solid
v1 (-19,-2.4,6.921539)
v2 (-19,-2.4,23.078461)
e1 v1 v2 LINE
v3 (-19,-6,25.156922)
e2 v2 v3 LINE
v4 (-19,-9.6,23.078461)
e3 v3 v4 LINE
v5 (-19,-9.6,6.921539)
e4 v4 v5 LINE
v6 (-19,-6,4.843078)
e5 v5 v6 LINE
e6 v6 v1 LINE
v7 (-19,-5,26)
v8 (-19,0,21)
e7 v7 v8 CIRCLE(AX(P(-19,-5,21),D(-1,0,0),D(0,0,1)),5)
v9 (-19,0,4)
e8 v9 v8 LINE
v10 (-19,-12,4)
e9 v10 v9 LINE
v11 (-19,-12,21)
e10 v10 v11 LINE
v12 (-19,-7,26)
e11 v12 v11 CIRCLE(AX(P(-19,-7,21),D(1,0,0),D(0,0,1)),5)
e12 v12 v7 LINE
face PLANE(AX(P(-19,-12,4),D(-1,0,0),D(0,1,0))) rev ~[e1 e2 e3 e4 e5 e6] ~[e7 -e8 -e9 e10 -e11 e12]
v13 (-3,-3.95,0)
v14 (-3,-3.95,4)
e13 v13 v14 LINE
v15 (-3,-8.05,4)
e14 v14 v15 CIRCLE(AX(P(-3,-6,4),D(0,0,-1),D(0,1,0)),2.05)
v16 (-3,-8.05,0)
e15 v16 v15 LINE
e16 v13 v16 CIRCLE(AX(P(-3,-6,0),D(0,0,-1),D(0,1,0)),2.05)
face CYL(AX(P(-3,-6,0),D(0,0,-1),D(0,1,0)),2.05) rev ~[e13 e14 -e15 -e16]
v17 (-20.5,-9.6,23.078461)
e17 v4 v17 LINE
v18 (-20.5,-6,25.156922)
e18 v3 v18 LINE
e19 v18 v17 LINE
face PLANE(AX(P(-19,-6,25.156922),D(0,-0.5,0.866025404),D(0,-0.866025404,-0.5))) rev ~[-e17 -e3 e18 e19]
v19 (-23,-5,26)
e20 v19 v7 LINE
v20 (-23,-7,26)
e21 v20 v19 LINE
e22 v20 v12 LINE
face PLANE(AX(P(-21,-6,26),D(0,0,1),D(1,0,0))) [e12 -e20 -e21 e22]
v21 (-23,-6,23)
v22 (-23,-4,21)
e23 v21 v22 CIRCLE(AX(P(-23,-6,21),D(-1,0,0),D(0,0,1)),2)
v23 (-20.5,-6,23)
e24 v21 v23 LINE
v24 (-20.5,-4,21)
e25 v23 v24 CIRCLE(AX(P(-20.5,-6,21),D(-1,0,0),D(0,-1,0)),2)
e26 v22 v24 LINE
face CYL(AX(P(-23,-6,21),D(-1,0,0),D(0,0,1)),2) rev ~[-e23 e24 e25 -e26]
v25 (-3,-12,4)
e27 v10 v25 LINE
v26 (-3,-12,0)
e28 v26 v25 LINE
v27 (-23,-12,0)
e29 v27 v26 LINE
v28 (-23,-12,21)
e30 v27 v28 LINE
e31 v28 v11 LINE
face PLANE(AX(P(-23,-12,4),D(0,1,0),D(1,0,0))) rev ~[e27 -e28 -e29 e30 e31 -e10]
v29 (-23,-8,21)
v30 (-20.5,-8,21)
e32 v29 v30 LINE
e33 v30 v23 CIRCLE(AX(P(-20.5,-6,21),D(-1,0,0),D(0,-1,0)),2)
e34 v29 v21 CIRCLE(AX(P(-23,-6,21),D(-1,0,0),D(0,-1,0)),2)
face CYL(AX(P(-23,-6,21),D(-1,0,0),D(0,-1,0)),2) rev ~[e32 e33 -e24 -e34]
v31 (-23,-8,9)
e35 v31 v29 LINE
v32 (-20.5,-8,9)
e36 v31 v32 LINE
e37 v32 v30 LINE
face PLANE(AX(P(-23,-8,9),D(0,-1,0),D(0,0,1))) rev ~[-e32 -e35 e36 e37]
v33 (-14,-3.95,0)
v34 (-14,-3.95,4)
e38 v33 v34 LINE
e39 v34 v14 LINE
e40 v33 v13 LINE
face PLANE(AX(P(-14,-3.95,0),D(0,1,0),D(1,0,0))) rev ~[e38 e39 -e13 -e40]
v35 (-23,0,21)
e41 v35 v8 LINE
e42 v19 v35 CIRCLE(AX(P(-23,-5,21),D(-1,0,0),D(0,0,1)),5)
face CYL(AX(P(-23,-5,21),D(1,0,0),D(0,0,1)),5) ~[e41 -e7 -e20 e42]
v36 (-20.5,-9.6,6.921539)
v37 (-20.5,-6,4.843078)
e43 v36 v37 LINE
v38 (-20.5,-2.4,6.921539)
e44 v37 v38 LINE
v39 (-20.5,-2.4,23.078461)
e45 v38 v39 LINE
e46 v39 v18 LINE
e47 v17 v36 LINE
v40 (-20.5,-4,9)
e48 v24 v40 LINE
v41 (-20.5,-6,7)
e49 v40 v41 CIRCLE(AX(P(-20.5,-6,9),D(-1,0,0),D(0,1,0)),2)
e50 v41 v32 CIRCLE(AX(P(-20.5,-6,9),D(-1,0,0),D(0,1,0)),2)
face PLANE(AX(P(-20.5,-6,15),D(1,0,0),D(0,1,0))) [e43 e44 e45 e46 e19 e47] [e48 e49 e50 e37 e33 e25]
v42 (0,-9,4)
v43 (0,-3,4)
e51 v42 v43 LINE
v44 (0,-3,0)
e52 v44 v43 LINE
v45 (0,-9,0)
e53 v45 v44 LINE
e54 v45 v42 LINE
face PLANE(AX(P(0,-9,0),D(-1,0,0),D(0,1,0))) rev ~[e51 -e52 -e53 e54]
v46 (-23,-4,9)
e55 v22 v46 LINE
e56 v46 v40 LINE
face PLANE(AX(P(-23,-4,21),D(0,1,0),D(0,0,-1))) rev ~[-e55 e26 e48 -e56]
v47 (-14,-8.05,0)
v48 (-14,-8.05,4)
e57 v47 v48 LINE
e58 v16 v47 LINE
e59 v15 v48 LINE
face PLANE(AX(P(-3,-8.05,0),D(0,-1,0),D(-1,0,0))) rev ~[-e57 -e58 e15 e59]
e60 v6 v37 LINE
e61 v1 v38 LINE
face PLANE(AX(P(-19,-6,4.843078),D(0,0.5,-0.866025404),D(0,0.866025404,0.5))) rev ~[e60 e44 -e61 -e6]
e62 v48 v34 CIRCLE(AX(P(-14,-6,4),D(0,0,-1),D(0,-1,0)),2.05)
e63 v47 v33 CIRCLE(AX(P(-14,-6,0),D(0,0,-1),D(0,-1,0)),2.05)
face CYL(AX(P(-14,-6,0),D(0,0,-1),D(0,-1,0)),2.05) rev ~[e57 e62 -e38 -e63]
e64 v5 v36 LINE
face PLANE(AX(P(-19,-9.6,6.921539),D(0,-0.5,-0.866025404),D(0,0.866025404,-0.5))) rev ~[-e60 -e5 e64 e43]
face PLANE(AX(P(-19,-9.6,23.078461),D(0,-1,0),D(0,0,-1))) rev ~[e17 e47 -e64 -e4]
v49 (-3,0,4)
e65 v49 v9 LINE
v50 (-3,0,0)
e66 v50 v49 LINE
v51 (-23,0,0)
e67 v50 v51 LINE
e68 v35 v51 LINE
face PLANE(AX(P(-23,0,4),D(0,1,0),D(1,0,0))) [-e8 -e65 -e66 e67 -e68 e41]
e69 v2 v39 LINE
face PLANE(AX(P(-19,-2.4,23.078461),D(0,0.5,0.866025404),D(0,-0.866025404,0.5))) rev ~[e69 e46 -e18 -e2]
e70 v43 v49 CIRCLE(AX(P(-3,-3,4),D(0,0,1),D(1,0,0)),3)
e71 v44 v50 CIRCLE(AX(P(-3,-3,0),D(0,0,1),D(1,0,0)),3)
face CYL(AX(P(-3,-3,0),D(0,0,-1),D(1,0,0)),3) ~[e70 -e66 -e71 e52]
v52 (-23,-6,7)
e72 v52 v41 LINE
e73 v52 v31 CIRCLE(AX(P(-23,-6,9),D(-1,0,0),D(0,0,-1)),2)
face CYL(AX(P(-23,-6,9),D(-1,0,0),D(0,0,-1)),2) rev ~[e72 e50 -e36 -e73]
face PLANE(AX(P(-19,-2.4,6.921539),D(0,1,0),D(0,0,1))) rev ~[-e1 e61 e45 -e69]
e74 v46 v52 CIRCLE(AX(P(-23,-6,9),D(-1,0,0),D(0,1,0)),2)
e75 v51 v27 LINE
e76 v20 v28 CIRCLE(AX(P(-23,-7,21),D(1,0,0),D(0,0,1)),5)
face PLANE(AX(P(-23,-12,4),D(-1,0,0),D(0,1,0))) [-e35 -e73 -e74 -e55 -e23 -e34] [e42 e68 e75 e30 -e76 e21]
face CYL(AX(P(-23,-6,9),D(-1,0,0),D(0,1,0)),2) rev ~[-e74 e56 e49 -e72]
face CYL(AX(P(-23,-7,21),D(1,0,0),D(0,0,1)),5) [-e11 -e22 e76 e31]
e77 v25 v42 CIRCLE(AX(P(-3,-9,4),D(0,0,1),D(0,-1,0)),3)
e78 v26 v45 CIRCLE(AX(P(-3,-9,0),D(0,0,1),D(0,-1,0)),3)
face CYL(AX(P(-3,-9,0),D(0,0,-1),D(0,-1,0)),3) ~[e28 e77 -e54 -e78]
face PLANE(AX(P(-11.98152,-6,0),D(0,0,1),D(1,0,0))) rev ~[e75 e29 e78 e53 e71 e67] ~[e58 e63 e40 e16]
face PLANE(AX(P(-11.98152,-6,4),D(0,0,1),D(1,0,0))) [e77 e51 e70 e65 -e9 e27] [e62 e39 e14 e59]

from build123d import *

# Parameters (mm, degrees)
F1_DEPTH = 4
F2_W     = 4
F2_H     = 12
F3_DEPTH = 22
F5_DEPTH = 25
F7_DEPTH = 1.5
F8_R     = 5


# Not quite as in the source:
# - a feature names something its author has since deleted; it is built from what else it names


with BuildPart() as f1:
    # F0 (on Top) → F1 (new body)
    with BuildSketch(Plane.XY):
        with BuildLine():
            ThreePointArc((0, -3), (-0.8786796564, -0.8786796564), (-3, 0))
            Line((-3, 0), (-23, 0))
            Line((-23, 0), (-23, -12))
            Line((-23, -12), (-3, -12))
            ThreePointArc((-3, -12), (-0.8786796564, -11.1213203436), (0, -9))
            Line((0, -9), (0, -3))
        make_face()
        with BuildLine():
            ThreePointArc((-3, -3.95), (-0.95, -6), (-3, -8.05))
            Line((-3, -8.05), (-14, -8.05))
            ThreePointArc((-14, -8.05), (-16.05, -6), (-14, -3.95))
            Line((-14, -3.95), (-3, -3.95))
        make_face(mode=Mode.SUBTRACT)
    extrude(amount=F1_DEPTH)

    # F2 (on face) → F3 (join)
    with BuildSketch(Plane.XY.offset(4)):
        with Locations((-21, -6)):
            Rectangle(F2_W, F2_H)
    extrude(amount=F3_DEPTH)

    # F4 (on face) → F5 (cut)
    with BuildSketch(Plane(origin=(-23, 0, 0), x_dir=(0, -1, 0), z_dir=(-1, 0, 0))):
        with BuildLine():
            Line((4, 21), (4, 9))
            ThreePointArc((4, 9), (4.5857864376, 7.5857864376), (6, 7))
            ThreePointArc((6, 7), (7.4142135624, 7.5857864376), (8, 9))
            Line((8, 9), (8, 21))
            ThreePointArc((8, 21), (7.4142135624, 22.4142135624), (6, 23))
            ThreePointArc((6, 23), (4.5857864376, 22.4142135624), (4, 21))
        make_face()
    extrude(amount=-F5_DEPTH, mode=Mode.SUBTRACT)

    # F6 (on face) → F7 (cut)
    with BuildSketch(Plane.YZ.offset(-19)):
        Polygon((-6, 4.8430780618), (-2.4, 6.9215390309), (-2.4, 23.0784609691), (-6, 25.1569219382), (-9.6, 23.0784609691), (-9.6, 6.9215390309), align=None)
        with BuildLine():
            ThreePointArc((-8, 21), (-6, 23), (-4, 21))
            Line((-4, 21), (-4, 9))
            ThreePointArc((-4, 9), (-6, 7), (-8, 9))
            Line((-8, 9), (-8, 21))
        make_face(mode=Mode.SUBTRACT)
    extrude(amount=-F7_DEPTH, mode=Mode.SUBTRACT)

    # F8
    f8_edges = [f1.edges().sort_by_distance(p)[0] for p in [
        (-21, -12, 26),
        (-21, 0, 26),
    ]]
    fillet(f8_edges, radius=F8_R)


solid = f1.part
